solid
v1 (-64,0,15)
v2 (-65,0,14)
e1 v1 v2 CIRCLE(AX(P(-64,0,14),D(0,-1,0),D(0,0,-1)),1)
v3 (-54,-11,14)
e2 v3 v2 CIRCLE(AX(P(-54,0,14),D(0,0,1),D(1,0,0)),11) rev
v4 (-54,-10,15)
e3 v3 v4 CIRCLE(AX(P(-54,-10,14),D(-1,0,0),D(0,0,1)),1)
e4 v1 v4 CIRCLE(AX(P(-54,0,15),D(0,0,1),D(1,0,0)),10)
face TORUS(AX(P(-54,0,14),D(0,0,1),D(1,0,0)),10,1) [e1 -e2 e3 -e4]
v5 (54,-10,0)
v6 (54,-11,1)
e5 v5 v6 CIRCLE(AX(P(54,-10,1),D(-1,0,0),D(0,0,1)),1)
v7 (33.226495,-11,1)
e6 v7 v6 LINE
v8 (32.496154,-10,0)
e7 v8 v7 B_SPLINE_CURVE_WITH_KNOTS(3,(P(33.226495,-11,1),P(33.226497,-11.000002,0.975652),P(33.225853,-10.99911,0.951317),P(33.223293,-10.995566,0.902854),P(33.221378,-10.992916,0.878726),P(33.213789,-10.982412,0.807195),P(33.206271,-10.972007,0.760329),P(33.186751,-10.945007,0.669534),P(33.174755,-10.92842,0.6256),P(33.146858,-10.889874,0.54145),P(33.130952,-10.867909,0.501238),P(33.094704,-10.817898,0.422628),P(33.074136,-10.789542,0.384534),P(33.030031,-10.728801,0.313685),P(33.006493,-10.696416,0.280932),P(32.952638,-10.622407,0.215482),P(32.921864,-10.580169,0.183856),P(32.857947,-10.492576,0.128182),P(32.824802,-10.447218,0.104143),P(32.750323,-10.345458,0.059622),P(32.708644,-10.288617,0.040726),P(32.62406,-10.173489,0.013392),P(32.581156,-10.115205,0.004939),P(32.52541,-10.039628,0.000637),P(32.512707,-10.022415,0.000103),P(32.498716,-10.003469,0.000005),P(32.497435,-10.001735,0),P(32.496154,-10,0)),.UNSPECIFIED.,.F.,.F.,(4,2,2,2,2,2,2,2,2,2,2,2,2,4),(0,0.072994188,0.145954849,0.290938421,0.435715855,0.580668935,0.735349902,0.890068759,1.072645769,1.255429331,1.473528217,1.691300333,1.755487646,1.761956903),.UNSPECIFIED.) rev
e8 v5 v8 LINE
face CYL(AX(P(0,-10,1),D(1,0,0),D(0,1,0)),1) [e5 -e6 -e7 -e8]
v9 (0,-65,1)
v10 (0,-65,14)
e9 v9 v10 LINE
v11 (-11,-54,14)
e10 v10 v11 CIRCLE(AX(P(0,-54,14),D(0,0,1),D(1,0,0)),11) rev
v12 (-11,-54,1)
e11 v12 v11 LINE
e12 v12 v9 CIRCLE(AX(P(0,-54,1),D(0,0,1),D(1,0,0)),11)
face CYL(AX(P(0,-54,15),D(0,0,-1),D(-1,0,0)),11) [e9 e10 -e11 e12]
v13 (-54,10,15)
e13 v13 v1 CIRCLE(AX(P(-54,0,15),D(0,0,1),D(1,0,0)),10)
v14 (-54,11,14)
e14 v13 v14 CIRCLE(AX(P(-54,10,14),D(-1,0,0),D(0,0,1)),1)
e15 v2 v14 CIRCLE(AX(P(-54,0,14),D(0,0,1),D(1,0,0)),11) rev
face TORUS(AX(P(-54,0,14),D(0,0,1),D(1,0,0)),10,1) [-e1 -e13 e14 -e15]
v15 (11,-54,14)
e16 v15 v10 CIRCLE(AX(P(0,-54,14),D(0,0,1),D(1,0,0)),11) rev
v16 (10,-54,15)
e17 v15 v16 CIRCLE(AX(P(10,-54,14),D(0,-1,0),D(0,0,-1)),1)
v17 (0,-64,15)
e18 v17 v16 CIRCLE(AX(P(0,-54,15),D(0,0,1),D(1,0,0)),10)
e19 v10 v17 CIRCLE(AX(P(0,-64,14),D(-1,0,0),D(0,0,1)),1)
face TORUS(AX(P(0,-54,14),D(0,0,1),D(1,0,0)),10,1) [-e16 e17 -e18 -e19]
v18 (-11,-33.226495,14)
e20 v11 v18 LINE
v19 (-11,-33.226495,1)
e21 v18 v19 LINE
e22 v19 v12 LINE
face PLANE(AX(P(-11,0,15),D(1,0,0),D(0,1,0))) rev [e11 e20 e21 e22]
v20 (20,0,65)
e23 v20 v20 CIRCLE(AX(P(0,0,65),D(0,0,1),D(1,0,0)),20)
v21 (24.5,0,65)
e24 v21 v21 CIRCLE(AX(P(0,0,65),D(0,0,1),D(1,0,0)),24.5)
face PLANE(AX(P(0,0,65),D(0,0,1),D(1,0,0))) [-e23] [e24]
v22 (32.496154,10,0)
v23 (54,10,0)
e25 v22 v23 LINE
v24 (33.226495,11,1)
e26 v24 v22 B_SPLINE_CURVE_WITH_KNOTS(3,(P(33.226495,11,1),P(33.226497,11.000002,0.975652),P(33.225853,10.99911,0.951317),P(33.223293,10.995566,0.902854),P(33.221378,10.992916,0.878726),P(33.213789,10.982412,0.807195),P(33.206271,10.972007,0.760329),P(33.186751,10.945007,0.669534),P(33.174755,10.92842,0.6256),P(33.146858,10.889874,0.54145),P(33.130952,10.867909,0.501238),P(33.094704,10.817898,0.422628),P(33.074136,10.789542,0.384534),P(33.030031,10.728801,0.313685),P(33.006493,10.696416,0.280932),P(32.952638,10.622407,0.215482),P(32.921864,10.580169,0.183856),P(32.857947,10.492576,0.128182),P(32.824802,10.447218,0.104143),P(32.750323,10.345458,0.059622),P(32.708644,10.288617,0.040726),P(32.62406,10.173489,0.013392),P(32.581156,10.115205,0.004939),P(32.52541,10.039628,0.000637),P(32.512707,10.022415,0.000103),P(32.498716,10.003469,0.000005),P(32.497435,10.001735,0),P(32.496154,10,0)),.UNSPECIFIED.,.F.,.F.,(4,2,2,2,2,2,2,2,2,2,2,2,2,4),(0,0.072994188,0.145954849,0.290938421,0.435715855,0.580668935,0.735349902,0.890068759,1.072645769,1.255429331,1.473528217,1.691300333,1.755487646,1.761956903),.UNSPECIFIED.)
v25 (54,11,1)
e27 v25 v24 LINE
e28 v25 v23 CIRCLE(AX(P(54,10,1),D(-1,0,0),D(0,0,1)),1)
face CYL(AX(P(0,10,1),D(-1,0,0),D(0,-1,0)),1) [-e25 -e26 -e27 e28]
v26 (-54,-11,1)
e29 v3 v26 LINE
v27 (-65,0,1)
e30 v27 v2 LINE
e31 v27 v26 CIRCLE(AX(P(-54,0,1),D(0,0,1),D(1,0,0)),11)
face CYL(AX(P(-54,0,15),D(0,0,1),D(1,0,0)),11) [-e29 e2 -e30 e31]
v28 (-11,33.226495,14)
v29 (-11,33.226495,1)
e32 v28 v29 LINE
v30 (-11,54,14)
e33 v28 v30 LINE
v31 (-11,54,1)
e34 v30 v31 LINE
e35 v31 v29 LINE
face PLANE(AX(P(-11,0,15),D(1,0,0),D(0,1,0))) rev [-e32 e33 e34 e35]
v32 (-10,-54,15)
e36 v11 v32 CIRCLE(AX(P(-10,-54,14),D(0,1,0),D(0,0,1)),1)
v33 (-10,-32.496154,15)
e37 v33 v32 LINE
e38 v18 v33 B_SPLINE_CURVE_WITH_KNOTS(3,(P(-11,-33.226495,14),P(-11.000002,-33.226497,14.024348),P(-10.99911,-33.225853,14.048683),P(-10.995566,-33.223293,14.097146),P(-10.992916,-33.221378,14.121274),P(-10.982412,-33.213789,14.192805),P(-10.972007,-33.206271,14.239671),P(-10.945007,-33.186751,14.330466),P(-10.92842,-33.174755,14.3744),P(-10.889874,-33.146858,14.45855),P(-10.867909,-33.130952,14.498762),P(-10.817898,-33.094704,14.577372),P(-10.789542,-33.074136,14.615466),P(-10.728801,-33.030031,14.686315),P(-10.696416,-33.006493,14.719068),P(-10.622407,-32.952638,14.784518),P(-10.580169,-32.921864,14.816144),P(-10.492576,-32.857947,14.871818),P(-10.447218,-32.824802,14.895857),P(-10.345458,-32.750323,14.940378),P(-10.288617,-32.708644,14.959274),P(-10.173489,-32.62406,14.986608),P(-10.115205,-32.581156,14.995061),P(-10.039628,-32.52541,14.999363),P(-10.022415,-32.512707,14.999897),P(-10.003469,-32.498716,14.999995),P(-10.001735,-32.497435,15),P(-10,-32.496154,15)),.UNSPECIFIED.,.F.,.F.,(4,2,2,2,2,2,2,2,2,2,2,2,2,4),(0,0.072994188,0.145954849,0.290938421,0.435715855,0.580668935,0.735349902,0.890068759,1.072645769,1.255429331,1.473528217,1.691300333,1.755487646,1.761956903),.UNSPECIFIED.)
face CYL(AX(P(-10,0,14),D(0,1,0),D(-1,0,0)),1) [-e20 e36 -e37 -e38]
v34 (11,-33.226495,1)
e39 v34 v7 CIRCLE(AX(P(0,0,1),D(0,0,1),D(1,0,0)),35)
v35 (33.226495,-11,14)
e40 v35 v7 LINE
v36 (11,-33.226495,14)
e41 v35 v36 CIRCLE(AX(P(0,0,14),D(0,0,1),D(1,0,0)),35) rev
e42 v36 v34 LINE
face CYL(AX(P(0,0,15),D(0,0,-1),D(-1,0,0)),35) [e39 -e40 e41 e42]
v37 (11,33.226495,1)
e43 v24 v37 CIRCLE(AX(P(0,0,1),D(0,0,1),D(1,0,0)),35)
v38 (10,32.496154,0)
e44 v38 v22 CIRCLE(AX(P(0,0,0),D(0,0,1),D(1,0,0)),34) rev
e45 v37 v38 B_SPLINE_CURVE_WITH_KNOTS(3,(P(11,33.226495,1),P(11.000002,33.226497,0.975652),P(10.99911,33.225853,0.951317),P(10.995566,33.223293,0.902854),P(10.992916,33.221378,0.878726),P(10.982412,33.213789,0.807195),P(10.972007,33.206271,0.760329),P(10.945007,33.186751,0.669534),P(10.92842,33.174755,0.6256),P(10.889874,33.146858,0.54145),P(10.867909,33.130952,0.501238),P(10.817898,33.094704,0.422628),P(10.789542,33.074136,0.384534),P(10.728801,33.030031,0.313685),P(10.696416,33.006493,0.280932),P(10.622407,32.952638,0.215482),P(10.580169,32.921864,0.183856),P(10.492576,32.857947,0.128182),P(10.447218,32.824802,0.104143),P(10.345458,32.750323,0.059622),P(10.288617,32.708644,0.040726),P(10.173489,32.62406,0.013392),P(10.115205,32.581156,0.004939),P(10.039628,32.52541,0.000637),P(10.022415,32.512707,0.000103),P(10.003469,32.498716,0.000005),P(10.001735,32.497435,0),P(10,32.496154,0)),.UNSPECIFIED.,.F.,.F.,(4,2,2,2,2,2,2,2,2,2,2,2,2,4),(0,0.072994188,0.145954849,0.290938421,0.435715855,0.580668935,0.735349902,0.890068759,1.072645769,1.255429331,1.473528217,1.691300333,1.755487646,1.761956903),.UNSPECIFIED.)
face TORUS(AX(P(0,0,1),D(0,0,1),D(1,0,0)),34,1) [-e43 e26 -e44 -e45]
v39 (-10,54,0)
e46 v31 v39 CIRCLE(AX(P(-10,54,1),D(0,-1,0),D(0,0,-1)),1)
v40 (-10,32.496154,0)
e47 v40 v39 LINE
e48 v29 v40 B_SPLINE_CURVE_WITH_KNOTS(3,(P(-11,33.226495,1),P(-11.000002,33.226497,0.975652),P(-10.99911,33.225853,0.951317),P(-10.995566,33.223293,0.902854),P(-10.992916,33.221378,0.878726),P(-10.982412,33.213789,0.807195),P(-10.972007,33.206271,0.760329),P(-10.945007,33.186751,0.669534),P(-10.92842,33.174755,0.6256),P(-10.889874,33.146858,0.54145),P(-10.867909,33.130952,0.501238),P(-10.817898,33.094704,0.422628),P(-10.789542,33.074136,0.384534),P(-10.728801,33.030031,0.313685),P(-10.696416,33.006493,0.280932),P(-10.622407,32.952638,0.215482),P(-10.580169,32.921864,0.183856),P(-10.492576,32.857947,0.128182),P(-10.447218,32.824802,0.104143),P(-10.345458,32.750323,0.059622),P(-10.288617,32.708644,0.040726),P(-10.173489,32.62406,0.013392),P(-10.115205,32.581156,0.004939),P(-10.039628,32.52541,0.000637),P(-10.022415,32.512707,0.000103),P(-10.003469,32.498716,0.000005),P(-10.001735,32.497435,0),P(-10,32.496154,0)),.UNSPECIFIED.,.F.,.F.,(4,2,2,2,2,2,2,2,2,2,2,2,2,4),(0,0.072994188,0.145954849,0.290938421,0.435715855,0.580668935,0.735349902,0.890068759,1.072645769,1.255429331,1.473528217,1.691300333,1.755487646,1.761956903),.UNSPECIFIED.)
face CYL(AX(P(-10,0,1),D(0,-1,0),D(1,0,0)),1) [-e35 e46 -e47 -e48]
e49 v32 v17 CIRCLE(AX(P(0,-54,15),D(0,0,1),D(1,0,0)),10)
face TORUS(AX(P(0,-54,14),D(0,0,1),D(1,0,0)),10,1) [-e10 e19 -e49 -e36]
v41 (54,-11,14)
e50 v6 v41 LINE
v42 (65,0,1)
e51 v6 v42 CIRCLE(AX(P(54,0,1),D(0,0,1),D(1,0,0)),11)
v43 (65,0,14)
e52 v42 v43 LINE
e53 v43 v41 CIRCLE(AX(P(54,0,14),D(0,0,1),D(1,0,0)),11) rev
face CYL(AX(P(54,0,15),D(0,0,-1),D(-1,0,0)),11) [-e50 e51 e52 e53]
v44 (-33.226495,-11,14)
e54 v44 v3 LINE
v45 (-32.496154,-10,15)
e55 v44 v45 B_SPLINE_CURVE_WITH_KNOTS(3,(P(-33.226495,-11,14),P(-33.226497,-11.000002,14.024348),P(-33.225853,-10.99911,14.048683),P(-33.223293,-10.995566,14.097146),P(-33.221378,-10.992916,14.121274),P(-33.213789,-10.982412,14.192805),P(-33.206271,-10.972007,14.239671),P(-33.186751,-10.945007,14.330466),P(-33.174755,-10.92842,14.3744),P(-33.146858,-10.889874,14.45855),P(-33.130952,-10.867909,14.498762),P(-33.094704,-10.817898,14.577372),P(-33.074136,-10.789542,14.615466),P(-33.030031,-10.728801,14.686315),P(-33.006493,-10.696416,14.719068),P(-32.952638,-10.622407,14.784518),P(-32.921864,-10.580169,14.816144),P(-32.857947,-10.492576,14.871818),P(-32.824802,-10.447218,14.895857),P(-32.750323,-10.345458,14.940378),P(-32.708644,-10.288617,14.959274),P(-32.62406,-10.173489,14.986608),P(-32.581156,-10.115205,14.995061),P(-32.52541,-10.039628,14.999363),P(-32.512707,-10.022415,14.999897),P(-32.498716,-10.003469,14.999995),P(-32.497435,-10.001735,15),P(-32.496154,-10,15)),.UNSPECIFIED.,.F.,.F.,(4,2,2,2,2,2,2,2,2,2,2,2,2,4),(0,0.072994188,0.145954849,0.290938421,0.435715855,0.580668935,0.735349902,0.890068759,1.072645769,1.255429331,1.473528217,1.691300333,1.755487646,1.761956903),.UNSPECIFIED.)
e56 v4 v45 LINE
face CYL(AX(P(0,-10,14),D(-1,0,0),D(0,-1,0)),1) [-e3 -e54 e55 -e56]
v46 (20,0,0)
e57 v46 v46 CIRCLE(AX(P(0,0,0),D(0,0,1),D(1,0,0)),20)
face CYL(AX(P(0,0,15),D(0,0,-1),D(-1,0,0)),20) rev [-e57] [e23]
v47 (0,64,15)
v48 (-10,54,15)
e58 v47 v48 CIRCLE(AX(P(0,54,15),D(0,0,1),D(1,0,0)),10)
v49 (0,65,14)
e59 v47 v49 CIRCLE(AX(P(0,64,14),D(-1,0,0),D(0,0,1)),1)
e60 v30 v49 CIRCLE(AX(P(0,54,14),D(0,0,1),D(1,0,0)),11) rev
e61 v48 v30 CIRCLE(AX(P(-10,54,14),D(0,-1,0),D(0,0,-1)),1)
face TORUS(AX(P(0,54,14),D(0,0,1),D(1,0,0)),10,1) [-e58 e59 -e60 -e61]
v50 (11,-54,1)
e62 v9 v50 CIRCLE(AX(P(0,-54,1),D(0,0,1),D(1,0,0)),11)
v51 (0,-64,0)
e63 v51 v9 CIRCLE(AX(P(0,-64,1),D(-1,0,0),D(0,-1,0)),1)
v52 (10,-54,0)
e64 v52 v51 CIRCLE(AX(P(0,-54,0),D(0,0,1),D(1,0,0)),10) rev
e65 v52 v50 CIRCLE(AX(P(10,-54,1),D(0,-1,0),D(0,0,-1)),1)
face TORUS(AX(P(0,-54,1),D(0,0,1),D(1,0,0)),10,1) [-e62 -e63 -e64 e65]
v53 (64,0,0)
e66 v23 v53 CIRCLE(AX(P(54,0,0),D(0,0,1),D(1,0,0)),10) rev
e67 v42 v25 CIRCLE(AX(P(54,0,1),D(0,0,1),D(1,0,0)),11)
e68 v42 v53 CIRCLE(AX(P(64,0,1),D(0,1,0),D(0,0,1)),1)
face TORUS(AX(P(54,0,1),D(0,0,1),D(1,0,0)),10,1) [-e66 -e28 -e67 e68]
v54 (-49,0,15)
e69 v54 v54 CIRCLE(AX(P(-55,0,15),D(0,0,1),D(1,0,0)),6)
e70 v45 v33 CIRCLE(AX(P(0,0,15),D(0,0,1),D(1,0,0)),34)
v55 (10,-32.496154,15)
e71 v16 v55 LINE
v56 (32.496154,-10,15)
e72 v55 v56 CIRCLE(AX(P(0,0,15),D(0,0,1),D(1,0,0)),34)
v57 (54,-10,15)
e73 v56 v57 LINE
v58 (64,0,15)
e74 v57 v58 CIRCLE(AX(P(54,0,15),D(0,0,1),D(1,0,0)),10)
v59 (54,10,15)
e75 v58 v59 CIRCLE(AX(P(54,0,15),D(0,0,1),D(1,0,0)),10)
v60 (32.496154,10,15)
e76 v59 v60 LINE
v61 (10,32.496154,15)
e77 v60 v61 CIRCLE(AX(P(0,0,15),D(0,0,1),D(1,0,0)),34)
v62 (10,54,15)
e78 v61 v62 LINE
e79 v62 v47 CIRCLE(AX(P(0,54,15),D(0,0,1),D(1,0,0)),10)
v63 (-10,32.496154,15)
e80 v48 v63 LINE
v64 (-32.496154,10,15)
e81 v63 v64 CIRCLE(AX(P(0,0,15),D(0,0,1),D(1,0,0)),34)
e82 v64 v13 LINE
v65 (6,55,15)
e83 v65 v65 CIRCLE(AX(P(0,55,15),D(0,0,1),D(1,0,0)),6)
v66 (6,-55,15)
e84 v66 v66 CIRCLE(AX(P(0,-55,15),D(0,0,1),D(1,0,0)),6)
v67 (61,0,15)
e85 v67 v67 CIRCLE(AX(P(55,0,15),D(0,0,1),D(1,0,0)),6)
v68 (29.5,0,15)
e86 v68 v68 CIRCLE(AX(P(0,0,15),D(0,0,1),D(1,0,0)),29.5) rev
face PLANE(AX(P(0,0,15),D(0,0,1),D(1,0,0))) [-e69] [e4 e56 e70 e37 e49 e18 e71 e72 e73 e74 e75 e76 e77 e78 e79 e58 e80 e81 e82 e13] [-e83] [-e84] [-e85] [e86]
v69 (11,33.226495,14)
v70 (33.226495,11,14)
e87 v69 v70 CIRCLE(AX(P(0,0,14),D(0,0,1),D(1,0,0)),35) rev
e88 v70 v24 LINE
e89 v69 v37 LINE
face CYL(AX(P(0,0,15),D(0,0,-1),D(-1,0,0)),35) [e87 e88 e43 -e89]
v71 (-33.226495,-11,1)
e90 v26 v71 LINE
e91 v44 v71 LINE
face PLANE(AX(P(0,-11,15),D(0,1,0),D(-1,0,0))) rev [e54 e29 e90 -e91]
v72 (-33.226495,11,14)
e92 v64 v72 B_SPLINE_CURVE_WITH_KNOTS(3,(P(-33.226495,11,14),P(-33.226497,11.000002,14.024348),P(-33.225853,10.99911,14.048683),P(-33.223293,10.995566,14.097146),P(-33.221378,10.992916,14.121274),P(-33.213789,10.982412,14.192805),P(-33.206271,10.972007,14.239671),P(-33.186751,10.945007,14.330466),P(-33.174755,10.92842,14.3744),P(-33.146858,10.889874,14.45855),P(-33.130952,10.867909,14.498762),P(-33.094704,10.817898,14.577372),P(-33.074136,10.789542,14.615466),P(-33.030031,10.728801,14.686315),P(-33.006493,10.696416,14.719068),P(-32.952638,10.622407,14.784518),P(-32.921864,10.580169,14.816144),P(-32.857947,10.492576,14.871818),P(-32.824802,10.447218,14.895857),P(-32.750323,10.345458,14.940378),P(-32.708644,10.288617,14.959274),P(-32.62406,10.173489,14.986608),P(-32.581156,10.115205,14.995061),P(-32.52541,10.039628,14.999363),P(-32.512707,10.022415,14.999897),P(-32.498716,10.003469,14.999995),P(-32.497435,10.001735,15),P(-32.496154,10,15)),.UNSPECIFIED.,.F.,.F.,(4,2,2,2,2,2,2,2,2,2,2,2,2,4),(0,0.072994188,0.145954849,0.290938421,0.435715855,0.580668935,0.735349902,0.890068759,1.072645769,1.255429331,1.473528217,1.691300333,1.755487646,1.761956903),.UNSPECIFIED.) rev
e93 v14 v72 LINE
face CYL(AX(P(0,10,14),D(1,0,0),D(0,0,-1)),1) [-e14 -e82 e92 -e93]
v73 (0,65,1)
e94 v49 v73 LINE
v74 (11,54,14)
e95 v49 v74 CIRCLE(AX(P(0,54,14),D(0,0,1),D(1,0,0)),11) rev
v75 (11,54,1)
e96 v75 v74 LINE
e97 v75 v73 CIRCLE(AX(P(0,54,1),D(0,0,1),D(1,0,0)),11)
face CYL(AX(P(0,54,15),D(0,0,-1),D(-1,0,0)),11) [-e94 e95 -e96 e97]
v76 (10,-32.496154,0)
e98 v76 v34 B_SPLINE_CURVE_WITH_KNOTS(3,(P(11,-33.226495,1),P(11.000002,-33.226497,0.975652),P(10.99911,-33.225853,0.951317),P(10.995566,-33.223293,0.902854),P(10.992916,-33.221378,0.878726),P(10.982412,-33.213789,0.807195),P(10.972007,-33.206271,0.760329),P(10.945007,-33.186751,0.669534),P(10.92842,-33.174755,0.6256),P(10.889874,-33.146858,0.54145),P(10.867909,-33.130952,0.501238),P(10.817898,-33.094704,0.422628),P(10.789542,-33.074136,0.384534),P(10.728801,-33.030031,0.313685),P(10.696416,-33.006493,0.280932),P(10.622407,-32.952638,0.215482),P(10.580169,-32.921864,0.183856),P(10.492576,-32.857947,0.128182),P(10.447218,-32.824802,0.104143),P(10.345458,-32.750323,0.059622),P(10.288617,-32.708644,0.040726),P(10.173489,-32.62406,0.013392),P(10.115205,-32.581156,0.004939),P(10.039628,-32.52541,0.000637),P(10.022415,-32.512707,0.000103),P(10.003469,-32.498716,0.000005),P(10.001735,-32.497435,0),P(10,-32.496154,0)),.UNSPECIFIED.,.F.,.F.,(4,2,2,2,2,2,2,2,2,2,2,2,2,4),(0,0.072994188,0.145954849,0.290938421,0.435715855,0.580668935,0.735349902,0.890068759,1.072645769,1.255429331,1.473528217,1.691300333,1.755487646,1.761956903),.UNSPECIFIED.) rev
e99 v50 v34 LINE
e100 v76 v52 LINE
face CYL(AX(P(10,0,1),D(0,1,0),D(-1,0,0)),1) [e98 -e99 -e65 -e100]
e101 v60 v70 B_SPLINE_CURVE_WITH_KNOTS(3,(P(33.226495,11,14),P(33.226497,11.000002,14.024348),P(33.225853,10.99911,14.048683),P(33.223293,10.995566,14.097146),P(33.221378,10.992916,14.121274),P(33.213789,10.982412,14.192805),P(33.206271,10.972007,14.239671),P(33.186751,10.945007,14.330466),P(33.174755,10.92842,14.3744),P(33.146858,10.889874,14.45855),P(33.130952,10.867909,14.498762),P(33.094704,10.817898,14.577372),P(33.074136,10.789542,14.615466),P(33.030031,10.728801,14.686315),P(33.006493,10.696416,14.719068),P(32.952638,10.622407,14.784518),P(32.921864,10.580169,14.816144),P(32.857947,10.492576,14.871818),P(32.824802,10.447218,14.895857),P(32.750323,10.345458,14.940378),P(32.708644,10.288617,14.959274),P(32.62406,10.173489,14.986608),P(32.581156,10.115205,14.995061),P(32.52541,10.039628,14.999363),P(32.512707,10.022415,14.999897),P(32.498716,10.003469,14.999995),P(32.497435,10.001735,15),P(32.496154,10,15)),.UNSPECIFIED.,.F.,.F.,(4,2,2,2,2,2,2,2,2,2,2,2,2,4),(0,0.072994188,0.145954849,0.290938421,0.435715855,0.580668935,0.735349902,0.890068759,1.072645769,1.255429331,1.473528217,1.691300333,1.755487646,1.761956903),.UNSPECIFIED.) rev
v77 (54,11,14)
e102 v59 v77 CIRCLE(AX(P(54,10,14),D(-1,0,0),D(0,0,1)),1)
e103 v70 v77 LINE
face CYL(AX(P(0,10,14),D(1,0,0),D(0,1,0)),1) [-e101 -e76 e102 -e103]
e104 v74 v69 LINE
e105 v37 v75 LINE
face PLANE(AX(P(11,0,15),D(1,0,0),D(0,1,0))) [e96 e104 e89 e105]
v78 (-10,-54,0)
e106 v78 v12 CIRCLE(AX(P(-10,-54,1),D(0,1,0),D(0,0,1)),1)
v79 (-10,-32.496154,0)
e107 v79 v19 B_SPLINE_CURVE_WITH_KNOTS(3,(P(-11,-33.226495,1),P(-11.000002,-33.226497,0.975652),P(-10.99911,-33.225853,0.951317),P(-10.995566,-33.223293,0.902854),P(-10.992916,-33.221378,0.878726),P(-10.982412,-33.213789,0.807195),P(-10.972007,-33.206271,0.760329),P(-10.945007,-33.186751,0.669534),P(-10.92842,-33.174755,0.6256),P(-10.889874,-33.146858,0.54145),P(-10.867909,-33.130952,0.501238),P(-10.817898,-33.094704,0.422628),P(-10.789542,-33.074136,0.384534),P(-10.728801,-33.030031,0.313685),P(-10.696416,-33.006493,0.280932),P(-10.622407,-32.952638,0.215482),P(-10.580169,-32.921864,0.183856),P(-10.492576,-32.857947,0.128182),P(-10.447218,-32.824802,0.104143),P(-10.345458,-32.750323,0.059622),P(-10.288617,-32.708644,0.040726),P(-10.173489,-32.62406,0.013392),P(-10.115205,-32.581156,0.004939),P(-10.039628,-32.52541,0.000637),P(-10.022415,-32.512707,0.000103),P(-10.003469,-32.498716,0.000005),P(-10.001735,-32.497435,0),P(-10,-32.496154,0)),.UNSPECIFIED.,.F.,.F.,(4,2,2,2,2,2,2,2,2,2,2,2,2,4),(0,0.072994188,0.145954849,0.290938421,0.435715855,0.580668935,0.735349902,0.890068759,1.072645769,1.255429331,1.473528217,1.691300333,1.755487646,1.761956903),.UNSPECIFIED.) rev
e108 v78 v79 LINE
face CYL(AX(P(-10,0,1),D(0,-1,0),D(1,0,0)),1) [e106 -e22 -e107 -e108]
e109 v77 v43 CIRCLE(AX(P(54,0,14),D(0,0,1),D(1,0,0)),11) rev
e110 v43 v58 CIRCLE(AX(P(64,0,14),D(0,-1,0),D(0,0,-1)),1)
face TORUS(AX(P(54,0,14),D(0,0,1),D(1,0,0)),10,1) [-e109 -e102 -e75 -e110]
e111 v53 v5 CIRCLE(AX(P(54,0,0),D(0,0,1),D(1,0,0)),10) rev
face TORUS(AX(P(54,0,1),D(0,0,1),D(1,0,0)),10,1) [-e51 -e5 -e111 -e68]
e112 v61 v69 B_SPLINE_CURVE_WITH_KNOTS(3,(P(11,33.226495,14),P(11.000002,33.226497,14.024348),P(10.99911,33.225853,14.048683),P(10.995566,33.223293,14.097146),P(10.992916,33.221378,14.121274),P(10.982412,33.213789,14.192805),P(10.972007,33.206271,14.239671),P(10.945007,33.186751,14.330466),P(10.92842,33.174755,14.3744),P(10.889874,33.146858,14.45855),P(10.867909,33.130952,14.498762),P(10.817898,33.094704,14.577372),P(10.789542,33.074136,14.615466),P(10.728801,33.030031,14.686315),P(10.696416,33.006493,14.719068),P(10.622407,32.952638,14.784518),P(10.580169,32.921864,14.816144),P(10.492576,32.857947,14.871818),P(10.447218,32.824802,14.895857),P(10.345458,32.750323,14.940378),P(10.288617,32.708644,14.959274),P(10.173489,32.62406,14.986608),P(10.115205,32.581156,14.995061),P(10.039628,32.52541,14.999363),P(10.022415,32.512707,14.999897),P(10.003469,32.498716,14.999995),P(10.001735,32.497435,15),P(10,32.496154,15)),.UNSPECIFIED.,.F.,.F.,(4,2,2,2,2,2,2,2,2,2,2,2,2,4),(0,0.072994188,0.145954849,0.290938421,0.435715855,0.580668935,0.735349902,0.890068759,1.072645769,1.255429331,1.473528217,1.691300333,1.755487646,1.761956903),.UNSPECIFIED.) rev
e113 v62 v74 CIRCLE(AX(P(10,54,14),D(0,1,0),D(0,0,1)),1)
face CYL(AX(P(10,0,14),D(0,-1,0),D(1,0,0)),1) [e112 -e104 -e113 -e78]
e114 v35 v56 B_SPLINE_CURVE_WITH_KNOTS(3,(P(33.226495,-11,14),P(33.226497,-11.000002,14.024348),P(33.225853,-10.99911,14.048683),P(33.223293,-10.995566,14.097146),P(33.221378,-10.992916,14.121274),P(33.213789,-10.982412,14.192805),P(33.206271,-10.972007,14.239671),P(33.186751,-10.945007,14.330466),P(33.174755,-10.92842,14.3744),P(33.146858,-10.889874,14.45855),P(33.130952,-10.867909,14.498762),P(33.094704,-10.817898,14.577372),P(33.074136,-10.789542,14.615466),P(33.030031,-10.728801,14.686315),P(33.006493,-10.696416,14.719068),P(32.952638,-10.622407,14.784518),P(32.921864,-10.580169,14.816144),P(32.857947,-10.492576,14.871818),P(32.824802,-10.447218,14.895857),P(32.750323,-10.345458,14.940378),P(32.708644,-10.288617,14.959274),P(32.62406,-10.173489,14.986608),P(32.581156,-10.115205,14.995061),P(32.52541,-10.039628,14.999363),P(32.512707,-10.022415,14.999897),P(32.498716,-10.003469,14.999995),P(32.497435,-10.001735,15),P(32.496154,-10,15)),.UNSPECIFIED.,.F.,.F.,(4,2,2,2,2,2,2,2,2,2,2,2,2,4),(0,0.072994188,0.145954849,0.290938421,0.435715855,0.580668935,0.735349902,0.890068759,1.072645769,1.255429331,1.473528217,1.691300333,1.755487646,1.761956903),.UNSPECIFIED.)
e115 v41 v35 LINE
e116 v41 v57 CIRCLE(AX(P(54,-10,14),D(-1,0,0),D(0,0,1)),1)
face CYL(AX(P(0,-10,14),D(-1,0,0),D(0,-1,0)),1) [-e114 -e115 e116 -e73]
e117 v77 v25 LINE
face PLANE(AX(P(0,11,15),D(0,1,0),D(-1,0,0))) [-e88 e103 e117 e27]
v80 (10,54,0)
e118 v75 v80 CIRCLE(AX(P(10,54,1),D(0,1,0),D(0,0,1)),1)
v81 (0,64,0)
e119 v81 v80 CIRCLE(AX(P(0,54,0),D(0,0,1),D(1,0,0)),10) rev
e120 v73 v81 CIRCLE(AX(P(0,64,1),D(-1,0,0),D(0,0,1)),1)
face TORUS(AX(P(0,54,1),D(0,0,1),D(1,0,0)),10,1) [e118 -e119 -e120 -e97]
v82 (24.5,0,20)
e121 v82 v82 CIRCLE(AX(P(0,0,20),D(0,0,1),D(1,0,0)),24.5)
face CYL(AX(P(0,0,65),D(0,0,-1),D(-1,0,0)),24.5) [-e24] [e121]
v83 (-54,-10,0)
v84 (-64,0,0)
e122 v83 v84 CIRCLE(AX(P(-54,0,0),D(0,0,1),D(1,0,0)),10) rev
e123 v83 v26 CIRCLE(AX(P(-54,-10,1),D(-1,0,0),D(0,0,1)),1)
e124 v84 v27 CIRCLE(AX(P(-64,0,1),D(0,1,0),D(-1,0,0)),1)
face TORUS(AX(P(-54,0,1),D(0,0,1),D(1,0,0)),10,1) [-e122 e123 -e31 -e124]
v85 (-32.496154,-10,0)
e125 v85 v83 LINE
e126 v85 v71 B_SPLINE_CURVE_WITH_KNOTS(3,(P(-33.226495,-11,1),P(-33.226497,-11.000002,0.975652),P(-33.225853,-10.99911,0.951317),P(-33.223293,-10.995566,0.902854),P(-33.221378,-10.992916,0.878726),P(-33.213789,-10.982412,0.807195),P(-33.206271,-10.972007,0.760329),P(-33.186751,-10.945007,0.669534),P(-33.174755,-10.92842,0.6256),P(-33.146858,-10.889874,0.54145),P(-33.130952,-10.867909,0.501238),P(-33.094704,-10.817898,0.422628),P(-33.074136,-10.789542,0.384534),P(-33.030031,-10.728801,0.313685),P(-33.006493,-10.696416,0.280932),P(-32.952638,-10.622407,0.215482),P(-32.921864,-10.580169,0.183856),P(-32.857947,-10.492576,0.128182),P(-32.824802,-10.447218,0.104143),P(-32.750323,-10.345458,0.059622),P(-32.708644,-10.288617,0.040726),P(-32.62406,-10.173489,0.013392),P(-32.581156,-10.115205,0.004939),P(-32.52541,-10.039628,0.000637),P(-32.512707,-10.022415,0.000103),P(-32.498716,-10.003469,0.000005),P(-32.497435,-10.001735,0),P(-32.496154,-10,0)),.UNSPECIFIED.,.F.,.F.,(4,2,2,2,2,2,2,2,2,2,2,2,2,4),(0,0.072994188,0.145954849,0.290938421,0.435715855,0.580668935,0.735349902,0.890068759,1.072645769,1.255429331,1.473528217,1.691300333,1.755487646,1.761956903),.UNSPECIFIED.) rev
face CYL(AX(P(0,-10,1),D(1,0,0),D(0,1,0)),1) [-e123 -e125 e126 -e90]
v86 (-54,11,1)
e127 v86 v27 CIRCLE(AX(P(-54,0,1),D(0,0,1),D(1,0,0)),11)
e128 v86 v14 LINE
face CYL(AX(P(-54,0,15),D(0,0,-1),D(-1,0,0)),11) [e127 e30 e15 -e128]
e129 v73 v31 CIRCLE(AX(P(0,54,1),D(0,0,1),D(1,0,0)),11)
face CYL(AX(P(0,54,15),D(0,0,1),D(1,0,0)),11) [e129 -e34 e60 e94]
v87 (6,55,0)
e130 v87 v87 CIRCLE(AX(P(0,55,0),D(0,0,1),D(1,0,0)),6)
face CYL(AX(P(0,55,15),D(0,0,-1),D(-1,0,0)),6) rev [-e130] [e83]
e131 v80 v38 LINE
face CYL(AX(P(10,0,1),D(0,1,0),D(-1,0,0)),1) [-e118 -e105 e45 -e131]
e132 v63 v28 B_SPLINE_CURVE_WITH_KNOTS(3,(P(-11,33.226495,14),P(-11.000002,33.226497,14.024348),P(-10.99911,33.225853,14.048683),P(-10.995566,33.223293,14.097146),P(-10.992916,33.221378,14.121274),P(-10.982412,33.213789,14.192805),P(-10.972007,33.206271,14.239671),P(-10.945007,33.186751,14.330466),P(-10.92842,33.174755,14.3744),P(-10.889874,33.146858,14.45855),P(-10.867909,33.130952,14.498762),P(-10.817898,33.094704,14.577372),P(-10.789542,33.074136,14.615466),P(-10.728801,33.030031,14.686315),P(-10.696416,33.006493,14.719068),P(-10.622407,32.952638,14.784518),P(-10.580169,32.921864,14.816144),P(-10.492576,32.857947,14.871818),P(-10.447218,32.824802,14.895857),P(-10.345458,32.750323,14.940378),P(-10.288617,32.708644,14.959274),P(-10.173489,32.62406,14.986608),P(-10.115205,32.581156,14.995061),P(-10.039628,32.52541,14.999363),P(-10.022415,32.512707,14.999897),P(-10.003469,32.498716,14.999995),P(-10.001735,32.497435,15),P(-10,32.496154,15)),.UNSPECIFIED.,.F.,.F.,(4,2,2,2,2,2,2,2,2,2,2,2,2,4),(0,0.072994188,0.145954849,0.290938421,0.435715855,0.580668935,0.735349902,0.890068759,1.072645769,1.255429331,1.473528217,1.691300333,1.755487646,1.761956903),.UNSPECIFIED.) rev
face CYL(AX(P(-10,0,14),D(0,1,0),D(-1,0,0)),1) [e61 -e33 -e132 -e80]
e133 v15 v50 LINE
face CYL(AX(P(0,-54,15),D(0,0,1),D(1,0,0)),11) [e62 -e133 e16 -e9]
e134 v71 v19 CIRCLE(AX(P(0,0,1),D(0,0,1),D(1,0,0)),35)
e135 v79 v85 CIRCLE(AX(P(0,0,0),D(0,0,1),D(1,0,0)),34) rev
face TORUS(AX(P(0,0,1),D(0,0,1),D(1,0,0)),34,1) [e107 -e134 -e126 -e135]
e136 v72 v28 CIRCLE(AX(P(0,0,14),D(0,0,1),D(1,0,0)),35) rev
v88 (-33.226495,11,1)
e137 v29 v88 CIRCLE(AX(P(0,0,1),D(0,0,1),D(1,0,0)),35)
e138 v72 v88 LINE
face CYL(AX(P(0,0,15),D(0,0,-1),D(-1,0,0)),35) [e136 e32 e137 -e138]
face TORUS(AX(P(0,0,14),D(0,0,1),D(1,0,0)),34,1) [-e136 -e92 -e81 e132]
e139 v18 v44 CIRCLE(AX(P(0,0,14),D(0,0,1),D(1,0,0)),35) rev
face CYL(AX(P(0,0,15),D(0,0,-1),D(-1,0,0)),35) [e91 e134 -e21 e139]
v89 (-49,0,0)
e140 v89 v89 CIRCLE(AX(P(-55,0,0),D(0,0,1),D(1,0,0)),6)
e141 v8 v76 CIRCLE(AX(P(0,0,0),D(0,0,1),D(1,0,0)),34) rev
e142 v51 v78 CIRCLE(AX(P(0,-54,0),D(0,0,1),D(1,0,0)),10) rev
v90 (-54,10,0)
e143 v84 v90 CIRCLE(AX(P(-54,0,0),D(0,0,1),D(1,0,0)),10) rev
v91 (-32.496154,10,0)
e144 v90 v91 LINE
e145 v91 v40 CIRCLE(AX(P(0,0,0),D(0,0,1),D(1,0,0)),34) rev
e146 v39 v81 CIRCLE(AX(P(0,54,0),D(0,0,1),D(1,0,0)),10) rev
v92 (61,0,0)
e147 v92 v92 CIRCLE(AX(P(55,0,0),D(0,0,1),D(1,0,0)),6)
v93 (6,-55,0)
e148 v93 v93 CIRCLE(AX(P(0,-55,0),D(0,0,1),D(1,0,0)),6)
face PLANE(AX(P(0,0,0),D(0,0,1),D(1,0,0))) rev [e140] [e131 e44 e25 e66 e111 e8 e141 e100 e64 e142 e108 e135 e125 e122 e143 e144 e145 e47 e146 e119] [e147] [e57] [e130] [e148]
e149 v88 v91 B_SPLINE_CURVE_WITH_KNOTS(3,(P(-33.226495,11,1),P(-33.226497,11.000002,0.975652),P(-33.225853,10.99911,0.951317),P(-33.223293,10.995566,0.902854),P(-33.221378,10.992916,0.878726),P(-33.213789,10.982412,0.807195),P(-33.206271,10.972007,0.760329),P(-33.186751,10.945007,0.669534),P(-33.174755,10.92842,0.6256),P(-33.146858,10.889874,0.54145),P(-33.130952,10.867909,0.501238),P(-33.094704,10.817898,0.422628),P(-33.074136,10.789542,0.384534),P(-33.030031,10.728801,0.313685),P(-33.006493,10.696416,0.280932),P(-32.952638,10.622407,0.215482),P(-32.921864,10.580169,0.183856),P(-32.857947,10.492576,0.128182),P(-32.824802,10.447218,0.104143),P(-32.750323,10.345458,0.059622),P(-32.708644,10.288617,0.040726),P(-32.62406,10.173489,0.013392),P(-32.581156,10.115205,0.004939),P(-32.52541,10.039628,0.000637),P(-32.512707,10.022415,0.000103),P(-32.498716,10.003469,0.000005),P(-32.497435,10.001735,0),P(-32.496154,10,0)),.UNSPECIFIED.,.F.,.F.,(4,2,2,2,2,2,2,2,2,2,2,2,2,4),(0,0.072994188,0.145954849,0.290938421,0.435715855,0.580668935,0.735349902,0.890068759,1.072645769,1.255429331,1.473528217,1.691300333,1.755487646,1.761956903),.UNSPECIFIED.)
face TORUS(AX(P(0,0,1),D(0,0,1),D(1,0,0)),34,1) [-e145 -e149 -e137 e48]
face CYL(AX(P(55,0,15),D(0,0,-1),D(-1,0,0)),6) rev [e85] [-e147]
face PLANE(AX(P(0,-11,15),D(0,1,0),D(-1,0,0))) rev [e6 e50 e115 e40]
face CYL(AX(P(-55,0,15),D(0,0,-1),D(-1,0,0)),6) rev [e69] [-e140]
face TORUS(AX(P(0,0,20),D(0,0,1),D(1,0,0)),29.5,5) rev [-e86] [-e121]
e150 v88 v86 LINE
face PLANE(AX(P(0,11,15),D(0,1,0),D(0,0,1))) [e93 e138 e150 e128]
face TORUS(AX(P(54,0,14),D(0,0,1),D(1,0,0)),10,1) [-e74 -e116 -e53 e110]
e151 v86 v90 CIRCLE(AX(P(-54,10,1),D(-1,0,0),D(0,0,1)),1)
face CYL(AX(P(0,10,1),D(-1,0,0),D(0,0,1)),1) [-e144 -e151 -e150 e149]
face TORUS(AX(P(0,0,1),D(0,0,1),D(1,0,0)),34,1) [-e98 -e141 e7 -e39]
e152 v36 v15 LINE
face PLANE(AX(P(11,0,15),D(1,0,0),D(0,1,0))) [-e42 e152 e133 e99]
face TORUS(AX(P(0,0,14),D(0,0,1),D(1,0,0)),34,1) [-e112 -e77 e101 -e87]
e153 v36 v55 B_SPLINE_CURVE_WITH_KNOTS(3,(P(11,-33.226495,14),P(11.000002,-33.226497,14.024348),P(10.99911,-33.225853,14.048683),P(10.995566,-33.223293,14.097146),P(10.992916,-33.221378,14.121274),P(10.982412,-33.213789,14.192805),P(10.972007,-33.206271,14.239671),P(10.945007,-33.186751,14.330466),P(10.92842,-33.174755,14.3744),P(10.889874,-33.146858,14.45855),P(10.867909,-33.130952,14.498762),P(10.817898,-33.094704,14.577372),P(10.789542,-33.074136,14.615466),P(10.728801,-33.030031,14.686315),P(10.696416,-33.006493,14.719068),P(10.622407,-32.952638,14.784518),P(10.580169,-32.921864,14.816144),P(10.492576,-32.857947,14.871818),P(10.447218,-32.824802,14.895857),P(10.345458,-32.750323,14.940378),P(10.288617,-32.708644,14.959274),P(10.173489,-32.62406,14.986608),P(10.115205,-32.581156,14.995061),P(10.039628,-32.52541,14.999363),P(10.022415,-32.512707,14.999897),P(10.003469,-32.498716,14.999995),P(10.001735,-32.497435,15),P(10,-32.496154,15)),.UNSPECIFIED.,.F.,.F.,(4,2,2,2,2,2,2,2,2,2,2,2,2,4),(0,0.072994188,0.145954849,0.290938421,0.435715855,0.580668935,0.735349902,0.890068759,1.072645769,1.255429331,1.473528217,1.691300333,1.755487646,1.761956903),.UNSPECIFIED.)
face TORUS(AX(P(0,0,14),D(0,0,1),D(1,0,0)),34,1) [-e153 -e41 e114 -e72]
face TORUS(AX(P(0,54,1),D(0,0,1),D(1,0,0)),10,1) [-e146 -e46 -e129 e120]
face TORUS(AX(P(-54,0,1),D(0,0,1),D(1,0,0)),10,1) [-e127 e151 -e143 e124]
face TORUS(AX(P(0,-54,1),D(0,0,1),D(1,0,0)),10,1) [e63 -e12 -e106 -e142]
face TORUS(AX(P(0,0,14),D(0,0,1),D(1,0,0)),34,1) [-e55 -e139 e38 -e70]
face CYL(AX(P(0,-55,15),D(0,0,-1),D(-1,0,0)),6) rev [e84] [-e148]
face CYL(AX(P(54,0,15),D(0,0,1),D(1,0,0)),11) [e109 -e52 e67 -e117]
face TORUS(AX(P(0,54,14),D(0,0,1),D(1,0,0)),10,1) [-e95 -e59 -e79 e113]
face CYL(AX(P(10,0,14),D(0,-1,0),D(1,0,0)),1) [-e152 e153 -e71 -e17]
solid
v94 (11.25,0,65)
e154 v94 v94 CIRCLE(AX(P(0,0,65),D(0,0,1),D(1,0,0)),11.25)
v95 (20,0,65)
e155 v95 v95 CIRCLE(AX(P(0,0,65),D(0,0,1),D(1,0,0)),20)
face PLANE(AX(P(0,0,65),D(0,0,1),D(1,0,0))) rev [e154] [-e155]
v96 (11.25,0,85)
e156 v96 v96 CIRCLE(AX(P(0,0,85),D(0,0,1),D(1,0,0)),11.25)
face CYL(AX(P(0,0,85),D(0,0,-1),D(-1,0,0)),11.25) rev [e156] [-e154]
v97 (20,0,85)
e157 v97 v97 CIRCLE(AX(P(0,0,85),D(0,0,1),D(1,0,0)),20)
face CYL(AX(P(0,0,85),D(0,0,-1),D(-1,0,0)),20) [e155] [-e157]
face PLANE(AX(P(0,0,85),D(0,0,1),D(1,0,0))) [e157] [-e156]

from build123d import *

# Parameters (mm, degrees)
SKETCH1_R           = 6
SKETCH1_R_2         = 20
BOSS_EXTRUDE1_DEPTH = 15
SKETCH5_R           = 24.5
SKETCH5_R_2         = 20
BOSS_EXTRUDE2_DEPTH = 50
SKETCH7_R           = 20
SKETCH7_R_2         = 11.25
BOSS_EXTRUDE3_DEPTH = 20
FILLET1_R           = 11
FILLET2_R           = 5
FILLET3_R           = 1
FILLET4_R           = 1


with BuildPart() as part:
    # Sketch1 → Boss-Extrude1 (new body)
    with BuildSketch(Plane.XY):
        with BuildLine():
            Line((-11, -33.226495452), (-11, -65))
            Line((-11, -65), (11, -65))
            Line((11, -65), (11, -33.226495452))
            ThreePointArc((11, -33.226495452), (24.748737342, -24.748737342), (33.226495452, -11))
            Line((33.226495452, -11), (65, -11))
            Line((65, -11), (65, 11))
            Line((65, 11), (33.226495452, 11))
            ThreePointArc((33.226495452, 11), (24.748737342, 24.748737342), (11, 33.226495452))
            Line((11, 33.226495452), (11, 65))
            Line((11, 65), (-11, 65))
            Line((-11, 65), (-11, 33.226495452))
            ThreePointArc((-11, 33.226495452), (-24.748737342, 24.748737342), (-33.226495452, 11))
            Line((-33.226495452, 11), (-65, 11))
            Line((-65, 11), (-65, -11))
            Line((-65, -11), (-33.226495452, -11))
            ThreePointArc((-33.226495452, -11), (-24.748737342, -24.748737342), (-11, -33.226495452))
        make_face()
        with Locations((0, 55)):
            Circle(SKETCH1_R, mode=Mode.SUBTRACT)
        with Locations((55, 0)):
            Circle(SKETCH1_R, mode=Mode.SUBTRACT)
        with Locations((0, -55)):
            Circle(SKETCH1_R, mode=Mode.SUBTRACT)
        with Locations((-55, 0)):
            Circle(SKETCH1_R, mode=Mode.SUBTRACT)
        Circle(SKETCH1_R_2, mode=Mode.SUBTRACT)
    extrude(amount=BOSS_EXTRUDE1_DEPTH)

    # Sketch5 → Boss-Extrude2 (add)
    with BuildSketch(Plane.XY.offset(15)):
        Circle(SKETCH5_R)
        Circle(SKETCH5_R_2, mode=Mode.SUBTRACT)
    extrude(amount=BOSS_EXTRUDE2_DEPTH)

    # Fillet1
    fillet1_edges = [part.edges().sort_by_distance(p)[0] for p in [
        (-65, 11, 7.5),
        (-65, -11, 7.5),
        (-11, -65, 7.5),
        (11, -65, 7.5),
        (-11, 65, 7.5),
        (11, 65, 7.5),
        (65, -11, 7.5),
        (65, 11, 7.5),
    ]]
    fillet(fillet1_edges, radius=FILLET1_R - 0.0001)  # a hair under: the kernel refuses the full size

    # Fillet2
    fillet2_edges = [part.edges().sort_by_distance(p)[0] for p in [
        (-24.5, 0, 15),
    ]]
    fillet(fillet2_edges, radius=FILLET2_R)

    # Fillet3
    fillet3_edges = [part.edges().sort_by_distance(p)[0] for p in [
        (-24.748737342, 24.748737342, 15),
        (-24.748737342, -24.748737342, 15),
        (-11, -43.613297726, 15),
        (11, -43.613297726, 15),
        (24.748737342, -24.748737342, 15),
        (43.613297726, -11, 15),
        (43.613297726, 11, 15),
        (24.748737342, 24.748737342, 15),
        (-43.613297726, 11, 15),
        (-43.613297726, -11, 15),
        (11, 43.613297726, 15),
        (-11, 43.613297726, 15),
        (61.778203882, 7.778203882, 15),
        (61.778203882, -7.778203882, 15),
        (7.778203882, 61.778203882, 15),
        (-7.778203882, 61.778203882, 15),
        (7.778203882, -61.778203882, 15),
        (-7.778203882, -61.778203882, 15),
        (-61.778203882, -7.778203882, 15),
        (-61.778203882, 7.778203882, 15),
    ]]
    fillet(fillet3_edges, radius=FILLET3_R)

    # Fillet4
    fillet4_edges = [part.edges().sort_by_distance(p)[0] for p in [
        (-24.748737342, 24.748737342, 0),
        (24.748737342, 24.748737342, 0),
        (43.613297726, 11, 0),
        (43.613297726, -11, 0),
        (24.748737342, -24.748737342, 0),
        (11, -43.613297726, 0),
        (-11, -43.613297726, 0),
        (-24.748737342, -24.748737342, 0),
        (-43.613297726, -11, 0),
        (-43.613297726, 11, 0),
        (-11, 43.613297726, 0),
        (11, 43.613297726, 0),
        (61.778203882, 7.778203882, 0),
        (61.778203882, -7.778203882, 0),
        (7.778203882, 61.778203882, 0),
        (-7.778203882, 61.778203882, 0),
        (7.778203882, -61.778203882, 0),
        (-7.778203882, -61.778203882, 0),
        (-61.778203882, -7.778203882, 0),
        (-61.778203882, 7.778203882, 0),
    ]]
    fillet(fillet4_edges, radius=FILLET4_R)


with BuildPart() as body_2:
    # Sketch7 → Boss-Extrude3 (new body)
    with BuildSketch(Plane.XY.offset(65)):
        Circle(SKETCH7_R)
        Circle(SKETCH7_R_2, mode=Mode.SUBTRACT)
    extrude(amount=BOSS_EXTRUDE3_DEPTH)


solid = Compound([part.part, body_2.part])
